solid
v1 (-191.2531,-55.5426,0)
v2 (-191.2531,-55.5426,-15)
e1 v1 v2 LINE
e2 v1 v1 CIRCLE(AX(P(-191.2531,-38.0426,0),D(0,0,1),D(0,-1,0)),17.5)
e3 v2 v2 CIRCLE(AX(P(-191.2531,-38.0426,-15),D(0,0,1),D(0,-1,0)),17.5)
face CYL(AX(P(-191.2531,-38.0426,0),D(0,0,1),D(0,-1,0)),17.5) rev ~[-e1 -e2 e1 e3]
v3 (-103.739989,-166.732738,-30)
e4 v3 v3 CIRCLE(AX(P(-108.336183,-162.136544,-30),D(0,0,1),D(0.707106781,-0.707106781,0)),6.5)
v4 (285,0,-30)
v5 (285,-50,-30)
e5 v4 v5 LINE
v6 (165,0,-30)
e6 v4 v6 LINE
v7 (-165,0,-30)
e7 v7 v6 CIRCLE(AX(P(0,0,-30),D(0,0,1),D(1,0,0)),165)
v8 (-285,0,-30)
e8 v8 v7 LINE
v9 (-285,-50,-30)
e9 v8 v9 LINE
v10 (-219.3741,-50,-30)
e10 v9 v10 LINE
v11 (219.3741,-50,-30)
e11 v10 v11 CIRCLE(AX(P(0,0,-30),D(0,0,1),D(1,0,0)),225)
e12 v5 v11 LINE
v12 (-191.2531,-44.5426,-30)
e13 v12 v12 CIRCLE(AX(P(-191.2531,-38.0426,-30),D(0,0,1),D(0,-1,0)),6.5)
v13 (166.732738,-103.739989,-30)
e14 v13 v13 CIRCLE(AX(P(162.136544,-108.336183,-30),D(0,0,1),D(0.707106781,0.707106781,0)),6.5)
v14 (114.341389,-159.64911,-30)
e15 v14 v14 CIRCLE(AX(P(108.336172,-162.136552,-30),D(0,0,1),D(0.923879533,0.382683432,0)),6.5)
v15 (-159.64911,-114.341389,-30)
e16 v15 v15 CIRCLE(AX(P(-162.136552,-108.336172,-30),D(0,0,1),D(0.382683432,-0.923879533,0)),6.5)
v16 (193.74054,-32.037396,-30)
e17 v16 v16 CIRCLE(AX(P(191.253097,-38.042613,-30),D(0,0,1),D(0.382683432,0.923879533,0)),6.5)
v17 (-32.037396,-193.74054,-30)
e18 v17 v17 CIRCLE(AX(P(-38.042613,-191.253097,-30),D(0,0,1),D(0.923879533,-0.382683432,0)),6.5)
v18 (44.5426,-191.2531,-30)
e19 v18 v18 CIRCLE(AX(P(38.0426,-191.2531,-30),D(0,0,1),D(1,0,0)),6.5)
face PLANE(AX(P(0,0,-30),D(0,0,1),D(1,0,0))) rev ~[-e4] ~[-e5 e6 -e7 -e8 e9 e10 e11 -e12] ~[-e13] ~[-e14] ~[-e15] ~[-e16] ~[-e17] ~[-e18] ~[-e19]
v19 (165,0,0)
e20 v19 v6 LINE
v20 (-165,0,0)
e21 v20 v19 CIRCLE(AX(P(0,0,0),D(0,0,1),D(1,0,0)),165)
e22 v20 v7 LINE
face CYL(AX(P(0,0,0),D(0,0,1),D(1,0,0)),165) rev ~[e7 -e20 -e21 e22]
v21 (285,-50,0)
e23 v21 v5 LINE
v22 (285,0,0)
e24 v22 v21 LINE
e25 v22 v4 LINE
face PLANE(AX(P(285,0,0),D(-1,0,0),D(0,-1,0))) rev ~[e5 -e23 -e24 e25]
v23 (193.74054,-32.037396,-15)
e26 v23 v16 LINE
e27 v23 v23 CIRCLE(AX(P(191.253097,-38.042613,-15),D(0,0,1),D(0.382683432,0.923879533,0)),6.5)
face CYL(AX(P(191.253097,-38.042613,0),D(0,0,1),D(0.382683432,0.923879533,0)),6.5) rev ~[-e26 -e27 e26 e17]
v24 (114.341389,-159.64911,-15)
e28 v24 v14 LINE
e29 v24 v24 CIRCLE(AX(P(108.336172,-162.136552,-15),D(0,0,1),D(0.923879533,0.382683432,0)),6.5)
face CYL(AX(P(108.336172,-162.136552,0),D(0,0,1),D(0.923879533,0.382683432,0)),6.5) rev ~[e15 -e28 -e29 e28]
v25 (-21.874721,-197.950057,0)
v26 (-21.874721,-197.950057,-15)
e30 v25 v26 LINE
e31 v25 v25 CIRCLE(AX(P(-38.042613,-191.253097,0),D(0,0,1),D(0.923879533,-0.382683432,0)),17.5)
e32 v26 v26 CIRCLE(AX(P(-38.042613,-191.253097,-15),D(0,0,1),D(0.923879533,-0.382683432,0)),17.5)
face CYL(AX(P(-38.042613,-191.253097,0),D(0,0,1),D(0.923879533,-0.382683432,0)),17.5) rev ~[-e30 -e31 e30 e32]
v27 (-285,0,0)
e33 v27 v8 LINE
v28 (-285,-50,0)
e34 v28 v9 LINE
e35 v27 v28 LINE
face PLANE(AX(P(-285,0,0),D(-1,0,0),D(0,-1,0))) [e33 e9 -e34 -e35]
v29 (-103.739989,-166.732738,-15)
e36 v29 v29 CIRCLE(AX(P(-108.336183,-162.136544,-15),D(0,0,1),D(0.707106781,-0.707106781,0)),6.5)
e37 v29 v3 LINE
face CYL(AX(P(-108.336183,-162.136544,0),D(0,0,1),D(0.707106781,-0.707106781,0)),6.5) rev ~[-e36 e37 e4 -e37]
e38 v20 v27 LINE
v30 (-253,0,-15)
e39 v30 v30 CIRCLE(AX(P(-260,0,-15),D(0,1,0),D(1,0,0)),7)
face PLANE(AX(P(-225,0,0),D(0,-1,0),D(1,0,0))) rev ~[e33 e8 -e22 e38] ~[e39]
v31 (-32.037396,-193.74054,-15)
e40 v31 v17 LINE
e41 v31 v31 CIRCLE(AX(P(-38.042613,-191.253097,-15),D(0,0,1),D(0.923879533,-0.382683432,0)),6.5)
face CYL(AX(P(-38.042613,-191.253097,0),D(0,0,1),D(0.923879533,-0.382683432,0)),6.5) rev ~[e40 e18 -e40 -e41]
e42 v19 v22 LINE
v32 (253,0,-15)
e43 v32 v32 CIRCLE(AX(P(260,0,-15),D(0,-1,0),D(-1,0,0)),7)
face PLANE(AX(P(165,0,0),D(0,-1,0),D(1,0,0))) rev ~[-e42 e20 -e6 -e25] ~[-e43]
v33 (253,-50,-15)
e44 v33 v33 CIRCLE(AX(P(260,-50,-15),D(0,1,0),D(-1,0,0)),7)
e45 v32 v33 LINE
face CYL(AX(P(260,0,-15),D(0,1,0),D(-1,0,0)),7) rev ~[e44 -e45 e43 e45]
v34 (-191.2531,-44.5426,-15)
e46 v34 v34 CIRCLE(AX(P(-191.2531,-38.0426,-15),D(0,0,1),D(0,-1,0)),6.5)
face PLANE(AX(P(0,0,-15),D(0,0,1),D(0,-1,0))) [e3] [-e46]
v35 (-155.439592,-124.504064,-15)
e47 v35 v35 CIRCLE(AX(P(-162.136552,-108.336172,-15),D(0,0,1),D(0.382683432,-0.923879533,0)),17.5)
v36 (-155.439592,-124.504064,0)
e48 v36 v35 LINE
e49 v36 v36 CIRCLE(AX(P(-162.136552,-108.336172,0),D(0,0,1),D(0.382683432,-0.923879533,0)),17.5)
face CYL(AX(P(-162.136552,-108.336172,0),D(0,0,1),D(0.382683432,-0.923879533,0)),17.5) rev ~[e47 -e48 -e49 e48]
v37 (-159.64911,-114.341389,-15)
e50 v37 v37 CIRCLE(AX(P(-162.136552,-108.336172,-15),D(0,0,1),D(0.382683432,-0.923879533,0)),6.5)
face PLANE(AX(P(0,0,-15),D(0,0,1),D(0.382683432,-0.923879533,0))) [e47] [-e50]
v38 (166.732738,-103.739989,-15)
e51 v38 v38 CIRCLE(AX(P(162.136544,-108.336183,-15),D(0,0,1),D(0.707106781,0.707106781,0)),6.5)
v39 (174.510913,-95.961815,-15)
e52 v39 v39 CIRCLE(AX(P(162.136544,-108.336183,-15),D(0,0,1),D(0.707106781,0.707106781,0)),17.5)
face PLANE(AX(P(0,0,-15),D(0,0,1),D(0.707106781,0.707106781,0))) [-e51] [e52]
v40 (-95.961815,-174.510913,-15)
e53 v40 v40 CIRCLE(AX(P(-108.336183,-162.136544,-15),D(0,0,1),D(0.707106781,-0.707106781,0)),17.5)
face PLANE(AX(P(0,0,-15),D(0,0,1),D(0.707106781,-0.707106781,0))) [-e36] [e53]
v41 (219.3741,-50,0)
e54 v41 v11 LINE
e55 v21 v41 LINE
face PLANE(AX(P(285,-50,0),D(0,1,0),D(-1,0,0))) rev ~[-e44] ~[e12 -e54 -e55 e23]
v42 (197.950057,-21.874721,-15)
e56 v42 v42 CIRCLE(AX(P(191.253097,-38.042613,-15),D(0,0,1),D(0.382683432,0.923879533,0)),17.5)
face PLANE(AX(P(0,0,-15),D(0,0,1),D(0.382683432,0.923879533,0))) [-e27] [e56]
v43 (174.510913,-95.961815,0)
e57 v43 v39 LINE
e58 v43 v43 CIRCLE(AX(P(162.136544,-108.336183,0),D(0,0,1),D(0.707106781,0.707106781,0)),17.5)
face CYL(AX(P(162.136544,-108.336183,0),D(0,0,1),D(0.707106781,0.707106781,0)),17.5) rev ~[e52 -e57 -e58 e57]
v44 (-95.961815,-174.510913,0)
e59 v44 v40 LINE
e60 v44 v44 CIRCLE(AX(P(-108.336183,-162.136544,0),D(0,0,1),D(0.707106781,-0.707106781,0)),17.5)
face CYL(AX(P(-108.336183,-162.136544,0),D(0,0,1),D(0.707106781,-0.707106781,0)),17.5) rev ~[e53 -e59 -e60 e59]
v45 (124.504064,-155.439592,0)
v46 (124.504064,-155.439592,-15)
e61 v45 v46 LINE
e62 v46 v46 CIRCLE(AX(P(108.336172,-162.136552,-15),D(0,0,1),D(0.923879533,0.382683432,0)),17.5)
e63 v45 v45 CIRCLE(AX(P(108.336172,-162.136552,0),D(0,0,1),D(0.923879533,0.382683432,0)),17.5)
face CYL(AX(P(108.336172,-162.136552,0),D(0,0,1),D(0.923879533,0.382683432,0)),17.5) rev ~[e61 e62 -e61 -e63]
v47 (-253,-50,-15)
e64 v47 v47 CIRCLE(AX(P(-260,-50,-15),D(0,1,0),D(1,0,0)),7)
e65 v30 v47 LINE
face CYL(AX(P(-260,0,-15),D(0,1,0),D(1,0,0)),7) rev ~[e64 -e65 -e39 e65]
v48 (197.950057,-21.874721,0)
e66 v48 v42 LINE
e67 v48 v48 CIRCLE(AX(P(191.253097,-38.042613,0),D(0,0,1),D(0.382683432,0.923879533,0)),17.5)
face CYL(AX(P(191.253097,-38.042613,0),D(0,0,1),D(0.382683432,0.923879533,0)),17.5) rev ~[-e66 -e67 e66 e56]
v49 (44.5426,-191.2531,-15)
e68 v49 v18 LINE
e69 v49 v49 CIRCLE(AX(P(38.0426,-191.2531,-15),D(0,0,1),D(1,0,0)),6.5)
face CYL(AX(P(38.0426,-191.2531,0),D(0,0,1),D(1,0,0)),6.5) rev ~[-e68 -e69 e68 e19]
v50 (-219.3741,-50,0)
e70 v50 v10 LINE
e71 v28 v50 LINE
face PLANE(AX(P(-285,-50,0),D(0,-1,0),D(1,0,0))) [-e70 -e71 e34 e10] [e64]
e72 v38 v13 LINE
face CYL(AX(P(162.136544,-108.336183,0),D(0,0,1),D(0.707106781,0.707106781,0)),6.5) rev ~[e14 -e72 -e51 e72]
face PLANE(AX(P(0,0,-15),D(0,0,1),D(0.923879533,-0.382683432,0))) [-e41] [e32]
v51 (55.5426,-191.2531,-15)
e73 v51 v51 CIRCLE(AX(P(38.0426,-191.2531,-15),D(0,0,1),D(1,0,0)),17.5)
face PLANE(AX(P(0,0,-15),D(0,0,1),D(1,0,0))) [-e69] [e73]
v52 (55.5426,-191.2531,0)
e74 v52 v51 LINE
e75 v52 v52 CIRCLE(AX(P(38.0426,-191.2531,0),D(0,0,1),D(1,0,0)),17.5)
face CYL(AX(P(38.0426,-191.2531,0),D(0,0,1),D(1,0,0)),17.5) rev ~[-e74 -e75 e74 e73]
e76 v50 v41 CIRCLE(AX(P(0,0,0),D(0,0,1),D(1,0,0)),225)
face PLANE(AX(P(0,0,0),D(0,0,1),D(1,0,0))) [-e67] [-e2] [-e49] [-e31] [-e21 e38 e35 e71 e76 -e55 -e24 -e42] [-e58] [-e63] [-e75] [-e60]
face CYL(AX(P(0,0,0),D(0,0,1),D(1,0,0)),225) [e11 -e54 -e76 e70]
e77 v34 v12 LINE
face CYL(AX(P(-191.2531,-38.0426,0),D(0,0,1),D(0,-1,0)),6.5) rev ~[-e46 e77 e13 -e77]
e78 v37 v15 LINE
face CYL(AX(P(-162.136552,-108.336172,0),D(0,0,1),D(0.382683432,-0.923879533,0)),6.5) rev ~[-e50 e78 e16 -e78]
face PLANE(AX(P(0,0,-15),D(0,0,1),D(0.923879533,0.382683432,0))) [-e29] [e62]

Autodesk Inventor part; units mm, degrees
ref_plane "YZ Plane" through (0, 0, 0) normal (1, 0, 0) x (0, 1, 0)
ref_plane "XZ Plane" through (0, 0, 0) normal (0, 1, 0) x (-1, 0, 0)
ref_plane "XY Plane" through (0, 0, 0) normal (0, 0, 1) x (1, 0, 0)
sketch "Sketch1" plane through (0, 0, 0) normal (0, 0, 1) x (1, 0, 0)
  circle A0 centre (0, 0) radius 195 construction
  line L0 (0, 195) -> (0, 225) construction
  line L1 (0, 195) -> (0, 165) construction
  circle A1 centre (0, 0) radius 165
  circle A2 centre (0, 0) radius 225
  line L2 (-165, 0) -> (-165, 80)
  line L3 (-165, 80) -> (-225, 80)
  line L4 (-225, 80) -> (-225, 0)
  line L5 (165, 0) -> (165, 80)
  line L6 (165, 80) -> (225, 80)
  line L7 (225, 80) -> (225, 0)
  line L8 (-225, 0) -> (-165, 0)
  line L9 (165, 0) -> (225, 0)
  line L10 (-225, 0) -> (-285, 0)
  line L11 (-285, 0) -> (-285, -50)
  line L12 (-285, -50) -> (-219.3741, -50)
  line L13 (225, 0) -> (285, 0)
  line L14 (285, 0) -> (285, -50)
  line L15 (285, -50) -> (219.3741, -50)
  dimension "d13" = 390
  dimension "d26" = 80
  dimension "d36" = 60
  dimension "d40" = 60
  dimension "d41" = 50
extrude "Extrusion1" add sketch "Sketch1" against normal blind 30 contours L9 A2 L8 A1 | L13 L14 L15 A2 | A2 L12 L11 L10
sketch "Sketch4" plane through (0, 0, 0) normal (0, 0, 1) x (1, 0, 0)
  circle A0 centre (38.0426, -191.2531) radius 6.5
  line L0 (0, 0) -> (38.0426, -191.2531) construction
  line L1 (0, 0) -> (0, -276.8337) construction
  dimension "d17" = 13
  dimension "d27" = 195
  dimension "d35" = 11.25
extrude "Extrusion4" cut sketch "Sketch4" against normal through all
sketch "Sketch5" plane through (0, 0, 0) normal (0, 0, 1) x (1, 0, 0)
  circle A0 centre (38.0426, -191.2531) radius 6.5 projected
  circle A1 centre (38.0426, -191.2531) radius 17.5
  point P0 (0, 0)
  dimension "d23" = 35
extrude "Extrusion5" cut sketch "Sketch5" against normal blind 15
pattern_circular "Circular Pattern3" count 8 over 157.5 about axis through (0, 0, 0) along (0, 0, -1) of "Extrusion4", "Extrusion5" both ways yes
sketch "Sketch7" plane through (-285, 0, 0) normal (0, 1, 0) x (1, 0, 0)
  circle A0 centre (25, 15) radius 7
  line L0 (0, 0) -> (0, 30) projected
  point P0 (285, 0)
  point P1 (0, 15)
  dimension "d42" = 14
  dimension "d43" = 25
extrude "Extrusion7" cut sketch "Sketch7" against normal through all
mirror "Mirror1" about plane through (0, 0, 0) normal (1, 0, 0) of "Extrusion7"
equation "\"d13\" = Шпил_пласт_НОС_диам_центров"
equation "\"d40\" = d36"
equation "\"d27\" = 0.5 * Шпил_пласт_НОС_диам_центров"
equation "\"BendReliefDepth\" = 0.5 * Thickness"
equation "\"Шпил_пласт_НОС_диам_центров\" = 390"
equation "\"Thickness\" = 30"
properties part number "ДМФ 091 Постель НОС"
